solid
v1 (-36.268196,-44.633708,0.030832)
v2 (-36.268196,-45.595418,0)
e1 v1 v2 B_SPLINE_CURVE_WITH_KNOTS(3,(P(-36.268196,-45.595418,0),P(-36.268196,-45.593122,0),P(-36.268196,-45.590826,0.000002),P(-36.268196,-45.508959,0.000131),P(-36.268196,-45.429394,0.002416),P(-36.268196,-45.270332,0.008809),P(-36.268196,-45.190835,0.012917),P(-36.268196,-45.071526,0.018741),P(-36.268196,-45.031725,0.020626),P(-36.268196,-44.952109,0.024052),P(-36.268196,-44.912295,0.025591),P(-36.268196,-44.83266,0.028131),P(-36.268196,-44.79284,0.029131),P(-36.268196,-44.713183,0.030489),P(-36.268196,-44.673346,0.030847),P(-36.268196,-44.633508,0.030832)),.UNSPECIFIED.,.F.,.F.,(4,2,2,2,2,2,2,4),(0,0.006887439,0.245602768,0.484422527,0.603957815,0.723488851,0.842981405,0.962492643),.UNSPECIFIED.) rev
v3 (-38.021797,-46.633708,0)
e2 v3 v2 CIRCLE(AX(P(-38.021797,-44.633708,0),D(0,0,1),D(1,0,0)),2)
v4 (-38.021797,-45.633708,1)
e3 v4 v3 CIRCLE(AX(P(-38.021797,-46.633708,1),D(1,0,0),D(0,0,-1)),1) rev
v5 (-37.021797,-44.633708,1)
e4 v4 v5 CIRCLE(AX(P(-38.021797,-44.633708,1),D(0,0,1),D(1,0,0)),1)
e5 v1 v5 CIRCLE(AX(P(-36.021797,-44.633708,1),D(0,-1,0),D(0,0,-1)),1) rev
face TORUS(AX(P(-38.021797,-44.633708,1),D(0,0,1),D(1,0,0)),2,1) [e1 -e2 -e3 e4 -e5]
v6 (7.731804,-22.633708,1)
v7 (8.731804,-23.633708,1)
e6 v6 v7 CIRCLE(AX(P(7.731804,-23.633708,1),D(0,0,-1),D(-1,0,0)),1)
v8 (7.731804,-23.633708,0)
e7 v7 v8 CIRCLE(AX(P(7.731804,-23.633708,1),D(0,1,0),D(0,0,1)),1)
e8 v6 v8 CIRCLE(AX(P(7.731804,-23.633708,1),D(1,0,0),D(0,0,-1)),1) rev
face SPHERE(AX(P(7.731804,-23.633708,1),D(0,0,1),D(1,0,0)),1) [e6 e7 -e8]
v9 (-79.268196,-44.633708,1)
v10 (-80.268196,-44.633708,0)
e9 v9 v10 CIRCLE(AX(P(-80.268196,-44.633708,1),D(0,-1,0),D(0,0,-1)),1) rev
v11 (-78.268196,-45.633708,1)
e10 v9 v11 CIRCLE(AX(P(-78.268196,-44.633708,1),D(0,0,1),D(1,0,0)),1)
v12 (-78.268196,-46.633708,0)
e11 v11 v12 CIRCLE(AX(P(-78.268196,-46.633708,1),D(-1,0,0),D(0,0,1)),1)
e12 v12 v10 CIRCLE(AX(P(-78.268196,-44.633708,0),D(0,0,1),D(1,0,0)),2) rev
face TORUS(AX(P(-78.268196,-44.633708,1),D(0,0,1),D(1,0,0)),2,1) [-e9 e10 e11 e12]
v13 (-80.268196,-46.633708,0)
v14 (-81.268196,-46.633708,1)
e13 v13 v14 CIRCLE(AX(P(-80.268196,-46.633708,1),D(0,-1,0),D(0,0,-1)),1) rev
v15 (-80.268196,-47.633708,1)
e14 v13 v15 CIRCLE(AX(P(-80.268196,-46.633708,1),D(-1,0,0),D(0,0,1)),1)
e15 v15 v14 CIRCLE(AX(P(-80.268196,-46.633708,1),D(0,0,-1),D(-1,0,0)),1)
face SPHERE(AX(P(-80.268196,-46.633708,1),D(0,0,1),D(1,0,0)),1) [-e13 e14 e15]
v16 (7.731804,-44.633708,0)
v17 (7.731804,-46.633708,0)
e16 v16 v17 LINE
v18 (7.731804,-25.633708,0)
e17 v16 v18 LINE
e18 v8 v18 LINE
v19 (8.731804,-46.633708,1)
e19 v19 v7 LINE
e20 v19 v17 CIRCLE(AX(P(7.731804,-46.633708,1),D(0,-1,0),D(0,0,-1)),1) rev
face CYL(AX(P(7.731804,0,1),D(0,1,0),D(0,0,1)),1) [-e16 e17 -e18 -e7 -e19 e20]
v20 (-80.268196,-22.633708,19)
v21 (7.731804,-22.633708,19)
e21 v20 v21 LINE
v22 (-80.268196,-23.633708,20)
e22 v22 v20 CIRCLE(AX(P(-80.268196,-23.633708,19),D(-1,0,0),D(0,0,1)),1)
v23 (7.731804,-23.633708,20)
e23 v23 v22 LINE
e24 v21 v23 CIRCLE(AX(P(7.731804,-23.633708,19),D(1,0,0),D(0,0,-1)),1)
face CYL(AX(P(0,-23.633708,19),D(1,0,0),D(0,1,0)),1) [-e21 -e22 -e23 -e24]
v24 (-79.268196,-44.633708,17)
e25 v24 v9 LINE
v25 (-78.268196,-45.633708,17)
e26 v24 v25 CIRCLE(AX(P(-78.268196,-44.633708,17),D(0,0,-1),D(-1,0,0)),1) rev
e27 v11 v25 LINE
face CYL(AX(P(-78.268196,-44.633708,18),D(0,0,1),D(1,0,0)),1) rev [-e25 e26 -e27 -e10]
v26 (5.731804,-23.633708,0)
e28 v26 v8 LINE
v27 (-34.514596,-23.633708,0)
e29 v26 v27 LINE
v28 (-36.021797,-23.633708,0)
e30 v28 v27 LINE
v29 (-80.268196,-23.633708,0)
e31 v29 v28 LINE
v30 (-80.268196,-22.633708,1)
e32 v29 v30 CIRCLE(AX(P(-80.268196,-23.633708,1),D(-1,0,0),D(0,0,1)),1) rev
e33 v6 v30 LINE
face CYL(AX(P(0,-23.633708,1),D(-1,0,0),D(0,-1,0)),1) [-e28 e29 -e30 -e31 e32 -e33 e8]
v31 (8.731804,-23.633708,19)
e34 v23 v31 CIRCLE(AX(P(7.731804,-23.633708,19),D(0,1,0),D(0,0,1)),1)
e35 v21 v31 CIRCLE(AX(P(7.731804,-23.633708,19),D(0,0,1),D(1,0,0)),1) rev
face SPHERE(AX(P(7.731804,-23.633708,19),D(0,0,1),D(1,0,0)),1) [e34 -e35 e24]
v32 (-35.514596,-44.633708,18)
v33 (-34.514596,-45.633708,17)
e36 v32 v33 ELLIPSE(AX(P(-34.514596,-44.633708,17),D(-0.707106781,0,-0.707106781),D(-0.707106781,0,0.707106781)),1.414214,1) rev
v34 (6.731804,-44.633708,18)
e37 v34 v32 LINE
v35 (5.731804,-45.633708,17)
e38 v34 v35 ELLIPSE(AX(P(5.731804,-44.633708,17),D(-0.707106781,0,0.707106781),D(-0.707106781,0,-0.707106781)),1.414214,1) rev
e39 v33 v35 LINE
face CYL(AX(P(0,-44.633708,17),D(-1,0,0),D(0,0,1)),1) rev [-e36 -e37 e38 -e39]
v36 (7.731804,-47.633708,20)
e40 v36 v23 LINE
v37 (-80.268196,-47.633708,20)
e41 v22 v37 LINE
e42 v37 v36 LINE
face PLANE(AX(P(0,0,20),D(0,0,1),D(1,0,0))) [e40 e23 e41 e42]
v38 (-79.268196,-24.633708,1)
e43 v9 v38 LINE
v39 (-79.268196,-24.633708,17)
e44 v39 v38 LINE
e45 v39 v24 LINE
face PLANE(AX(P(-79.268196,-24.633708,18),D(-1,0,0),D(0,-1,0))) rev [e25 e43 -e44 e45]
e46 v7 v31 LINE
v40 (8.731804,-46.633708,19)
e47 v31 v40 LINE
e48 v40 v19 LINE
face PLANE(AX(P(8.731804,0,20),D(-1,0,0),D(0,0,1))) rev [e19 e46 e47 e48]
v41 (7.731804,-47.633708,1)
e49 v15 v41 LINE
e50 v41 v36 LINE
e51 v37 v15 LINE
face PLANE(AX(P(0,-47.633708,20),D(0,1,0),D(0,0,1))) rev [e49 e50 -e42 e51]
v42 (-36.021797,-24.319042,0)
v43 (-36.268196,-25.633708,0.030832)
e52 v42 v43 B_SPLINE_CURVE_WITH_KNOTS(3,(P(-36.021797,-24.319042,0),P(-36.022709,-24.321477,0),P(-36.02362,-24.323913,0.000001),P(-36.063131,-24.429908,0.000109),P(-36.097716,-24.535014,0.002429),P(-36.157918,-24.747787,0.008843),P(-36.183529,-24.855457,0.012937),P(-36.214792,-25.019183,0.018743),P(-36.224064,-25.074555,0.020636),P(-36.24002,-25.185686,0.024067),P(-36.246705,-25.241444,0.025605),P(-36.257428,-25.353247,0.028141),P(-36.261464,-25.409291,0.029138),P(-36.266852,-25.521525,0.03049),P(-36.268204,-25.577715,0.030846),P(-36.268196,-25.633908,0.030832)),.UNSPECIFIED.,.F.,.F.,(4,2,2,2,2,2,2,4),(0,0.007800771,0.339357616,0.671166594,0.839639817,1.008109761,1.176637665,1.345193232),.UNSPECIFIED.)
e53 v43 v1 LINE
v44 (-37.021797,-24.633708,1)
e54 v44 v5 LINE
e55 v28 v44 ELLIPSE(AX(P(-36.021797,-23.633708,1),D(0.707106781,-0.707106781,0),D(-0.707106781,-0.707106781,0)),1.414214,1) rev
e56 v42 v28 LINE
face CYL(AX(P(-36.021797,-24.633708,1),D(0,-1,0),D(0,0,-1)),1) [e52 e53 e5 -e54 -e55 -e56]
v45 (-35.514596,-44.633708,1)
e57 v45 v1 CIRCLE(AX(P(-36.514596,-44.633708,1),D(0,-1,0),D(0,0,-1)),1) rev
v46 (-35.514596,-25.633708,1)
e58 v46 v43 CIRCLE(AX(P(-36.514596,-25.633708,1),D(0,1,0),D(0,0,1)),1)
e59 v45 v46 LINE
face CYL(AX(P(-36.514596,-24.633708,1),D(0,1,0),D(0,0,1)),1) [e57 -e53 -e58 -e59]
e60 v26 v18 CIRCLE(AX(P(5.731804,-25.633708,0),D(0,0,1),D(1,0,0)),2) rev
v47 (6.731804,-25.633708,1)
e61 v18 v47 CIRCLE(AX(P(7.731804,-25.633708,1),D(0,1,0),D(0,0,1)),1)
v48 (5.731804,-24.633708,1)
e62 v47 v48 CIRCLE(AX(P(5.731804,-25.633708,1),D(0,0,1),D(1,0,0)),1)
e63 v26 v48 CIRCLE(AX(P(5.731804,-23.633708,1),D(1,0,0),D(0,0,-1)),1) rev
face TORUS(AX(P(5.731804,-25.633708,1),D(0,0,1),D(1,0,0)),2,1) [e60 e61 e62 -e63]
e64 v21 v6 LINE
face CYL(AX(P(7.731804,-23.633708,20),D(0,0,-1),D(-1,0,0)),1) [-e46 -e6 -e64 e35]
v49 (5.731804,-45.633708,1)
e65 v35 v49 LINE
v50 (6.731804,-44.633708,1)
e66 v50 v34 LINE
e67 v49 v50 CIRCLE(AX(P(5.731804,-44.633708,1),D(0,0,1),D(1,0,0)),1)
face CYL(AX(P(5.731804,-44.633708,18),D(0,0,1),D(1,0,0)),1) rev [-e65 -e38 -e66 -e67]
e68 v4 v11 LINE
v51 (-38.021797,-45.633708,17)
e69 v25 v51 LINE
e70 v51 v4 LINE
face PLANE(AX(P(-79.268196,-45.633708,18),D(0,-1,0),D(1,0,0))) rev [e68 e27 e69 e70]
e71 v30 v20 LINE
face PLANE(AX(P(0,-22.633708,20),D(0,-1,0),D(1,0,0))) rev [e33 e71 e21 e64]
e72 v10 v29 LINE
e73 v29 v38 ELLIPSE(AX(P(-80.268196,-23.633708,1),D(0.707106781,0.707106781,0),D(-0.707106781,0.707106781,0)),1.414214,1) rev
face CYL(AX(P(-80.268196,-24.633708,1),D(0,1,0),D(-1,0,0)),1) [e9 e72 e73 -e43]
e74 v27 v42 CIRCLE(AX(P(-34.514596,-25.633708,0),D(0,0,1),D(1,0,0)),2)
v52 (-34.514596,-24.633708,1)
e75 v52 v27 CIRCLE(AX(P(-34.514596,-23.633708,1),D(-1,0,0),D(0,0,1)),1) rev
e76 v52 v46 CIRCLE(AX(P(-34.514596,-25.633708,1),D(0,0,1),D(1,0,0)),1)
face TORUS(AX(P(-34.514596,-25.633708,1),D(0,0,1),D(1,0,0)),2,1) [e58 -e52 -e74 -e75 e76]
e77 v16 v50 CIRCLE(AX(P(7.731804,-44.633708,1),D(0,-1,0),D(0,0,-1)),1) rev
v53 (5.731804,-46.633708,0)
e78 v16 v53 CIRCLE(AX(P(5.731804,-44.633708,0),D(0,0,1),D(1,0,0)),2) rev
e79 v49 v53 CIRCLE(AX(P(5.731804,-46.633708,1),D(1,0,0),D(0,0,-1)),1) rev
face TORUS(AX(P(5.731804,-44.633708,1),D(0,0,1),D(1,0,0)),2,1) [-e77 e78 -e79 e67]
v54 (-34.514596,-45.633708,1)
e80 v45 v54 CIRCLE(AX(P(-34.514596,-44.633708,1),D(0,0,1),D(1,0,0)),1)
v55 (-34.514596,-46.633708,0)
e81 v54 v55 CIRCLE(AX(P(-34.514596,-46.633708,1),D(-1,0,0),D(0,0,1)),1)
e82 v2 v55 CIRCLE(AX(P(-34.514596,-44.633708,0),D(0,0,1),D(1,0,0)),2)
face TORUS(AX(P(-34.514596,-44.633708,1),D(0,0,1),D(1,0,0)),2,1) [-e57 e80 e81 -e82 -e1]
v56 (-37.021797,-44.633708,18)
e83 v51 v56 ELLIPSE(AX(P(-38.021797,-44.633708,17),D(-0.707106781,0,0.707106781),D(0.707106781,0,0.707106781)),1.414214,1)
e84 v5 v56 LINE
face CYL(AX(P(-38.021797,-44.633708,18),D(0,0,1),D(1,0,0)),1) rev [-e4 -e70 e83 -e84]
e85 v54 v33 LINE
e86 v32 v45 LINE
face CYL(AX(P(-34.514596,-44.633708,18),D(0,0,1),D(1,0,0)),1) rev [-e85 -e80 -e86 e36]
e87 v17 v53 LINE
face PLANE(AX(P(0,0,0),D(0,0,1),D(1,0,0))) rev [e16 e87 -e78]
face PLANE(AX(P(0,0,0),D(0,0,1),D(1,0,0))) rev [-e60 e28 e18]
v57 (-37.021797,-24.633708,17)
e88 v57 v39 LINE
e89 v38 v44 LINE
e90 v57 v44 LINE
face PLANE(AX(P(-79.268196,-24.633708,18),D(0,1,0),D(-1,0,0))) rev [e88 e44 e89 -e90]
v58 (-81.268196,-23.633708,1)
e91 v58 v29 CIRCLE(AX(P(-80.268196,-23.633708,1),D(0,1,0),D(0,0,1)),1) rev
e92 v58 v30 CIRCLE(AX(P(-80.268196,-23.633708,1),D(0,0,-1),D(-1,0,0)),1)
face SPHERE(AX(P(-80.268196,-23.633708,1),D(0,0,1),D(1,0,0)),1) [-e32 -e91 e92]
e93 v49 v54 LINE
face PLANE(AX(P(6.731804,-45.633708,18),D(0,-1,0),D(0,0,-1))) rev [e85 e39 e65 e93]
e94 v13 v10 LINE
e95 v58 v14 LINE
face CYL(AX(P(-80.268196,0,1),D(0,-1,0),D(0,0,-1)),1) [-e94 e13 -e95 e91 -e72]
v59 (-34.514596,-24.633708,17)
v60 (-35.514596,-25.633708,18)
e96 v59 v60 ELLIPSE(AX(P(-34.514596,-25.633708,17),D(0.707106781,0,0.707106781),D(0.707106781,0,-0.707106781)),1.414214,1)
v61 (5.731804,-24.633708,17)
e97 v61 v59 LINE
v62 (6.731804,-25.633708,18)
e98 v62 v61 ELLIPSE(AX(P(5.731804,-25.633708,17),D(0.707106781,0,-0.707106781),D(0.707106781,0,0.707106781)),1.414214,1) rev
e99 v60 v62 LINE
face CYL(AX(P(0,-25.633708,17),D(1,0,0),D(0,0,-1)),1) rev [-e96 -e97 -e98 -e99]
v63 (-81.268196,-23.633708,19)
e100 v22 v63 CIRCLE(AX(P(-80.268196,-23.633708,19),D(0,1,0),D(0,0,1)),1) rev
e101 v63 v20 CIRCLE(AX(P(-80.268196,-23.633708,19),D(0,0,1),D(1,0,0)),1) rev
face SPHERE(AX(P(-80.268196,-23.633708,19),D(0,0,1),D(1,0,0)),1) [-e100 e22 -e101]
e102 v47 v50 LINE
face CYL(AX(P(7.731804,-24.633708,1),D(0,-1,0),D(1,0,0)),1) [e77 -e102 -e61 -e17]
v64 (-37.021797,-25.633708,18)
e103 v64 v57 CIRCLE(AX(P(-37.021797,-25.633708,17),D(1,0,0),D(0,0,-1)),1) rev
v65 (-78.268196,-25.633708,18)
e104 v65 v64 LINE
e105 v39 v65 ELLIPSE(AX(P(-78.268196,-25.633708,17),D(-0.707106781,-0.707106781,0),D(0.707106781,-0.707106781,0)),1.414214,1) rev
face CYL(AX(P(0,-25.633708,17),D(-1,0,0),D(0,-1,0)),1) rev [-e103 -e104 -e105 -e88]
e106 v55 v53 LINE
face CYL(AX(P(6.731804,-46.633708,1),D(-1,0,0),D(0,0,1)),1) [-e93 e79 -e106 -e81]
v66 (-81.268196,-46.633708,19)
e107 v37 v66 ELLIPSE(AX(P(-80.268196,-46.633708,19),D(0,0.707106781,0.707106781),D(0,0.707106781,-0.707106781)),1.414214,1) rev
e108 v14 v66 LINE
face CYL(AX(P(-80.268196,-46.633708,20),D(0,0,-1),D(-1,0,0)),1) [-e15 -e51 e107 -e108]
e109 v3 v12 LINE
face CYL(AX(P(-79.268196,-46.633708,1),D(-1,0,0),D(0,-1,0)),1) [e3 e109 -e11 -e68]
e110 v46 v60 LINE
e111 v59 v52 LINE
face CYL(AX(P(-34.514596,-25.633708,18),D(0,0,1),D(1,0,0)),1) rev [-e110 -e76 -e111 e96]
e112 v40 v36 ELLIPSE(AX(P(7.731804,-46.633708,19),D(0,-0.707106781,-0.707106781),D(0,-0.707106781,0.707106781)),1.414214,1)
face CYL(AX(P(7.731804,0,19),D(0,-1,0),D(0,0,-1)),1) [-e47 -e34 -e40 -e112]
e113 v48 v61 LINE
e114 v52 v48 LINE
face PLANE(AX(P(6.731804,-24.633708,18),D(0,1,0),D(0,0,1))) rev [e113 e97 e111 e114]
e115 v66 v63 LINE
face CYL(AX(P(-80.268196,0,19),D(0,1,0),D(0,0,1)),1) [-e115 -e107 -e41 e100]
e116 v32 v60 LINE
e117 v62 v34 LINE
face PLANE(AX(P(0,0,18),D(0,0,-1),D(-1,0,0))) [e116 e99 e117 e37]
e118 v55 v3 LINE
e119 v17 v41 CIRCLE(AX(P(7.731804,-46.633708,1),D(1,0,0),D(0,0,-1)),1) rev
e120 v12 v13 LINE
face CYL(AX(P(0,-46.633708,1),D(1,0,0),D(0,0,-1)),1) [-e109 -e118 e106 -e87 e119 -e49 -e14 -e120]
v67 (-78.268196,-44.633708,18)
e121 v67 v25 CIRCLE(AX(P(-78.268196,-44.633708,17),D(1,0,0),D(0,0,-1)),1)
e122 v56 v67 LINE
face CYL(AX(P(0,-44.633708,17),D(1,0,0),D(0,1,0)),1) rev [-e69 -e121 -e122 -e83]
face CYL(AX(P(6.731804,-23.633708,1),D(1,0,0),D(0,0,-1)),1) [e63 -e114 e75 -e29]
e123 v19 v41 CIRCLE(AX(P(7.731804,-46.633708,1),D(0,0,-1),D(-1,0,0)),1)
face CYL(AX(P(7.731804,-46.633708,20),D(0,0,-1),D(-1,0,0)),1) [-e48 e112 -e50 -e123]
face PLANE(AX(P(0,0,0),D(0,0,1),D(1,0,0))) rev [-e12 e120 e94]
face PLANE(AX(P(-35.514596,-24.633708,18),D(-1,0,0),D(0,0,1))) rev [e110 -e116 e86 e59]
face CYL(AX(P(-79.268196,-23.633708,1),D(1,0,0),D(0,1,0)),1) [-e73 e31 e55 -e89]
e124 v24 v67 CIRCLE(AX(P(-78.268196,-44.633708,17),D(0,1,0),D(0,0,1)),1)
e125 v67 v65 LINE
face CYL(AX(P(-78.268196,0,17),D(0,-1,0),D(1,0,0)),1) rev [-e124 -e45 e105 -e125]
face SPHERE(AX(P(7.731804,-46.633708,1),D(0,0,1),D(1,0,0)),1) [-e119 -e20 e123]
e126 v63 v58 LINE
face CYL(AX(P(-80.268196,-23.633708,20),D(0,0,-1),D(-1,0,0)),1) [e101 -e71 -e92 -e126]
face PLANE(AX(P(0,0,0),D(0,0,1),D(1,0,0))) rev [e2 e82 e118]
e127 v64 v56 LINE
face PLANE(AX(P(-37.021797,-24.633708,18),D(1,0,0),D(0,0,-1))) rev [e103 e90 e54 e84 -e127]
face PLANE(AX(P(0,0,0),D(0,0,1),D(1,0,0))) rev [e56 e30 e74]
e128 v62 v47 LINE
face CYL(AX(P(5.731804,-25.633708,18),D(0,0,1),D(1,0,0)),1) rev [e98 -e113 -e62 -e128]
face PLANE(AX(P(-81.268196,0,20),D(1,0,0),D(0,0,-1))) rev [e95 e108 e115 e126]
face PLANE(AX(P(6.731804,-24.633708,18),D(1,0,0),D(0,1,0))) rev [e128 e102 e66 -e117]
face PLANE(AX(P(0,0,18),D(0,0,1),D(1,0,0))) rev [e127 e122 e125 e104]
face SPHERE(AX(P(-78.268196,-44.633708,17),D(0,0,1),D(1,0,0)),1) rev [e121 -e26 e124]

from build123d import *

# Parameters (mm, degrees)
SKETCH_1_W          = 90
SKETCH_1_H          = 25
EXTRUDE_1_DEPTH     = 20
SKETCH_4_W          = 42.246399656
SKETCH_4_H          = 21
CUT_EXTRUDE_2_DEPTH = 18
FILLET_5_R          = 1


with BuildPart() as part:
    # 草圖1 → 填料-伸長1 (new body)
    with BuildSketch(Plane.XY):
        with Locations((-36.268196215, -35.133707849)):
            Rectangle(SKETCH_1_W, SKETCH_1_H)
    extrude(amount=EXTRUDE_1_DEPTH)

    # 草圖4 → 除料-伸長2 (cut)
    with BuildSketch(Plane(origin=(0, 0, 0), x_dir=(-1, 0, 0), z_dir=(0, 0, -1))):
        with Locations((14.391396043, -35.133707849)):
            Rectangle(SKETCH_4_W, SKETCH_4_H)
        with Locations((58.144996387, -35.133707849)):
            Rectangle(SKETCH_4_W, SKETCH_4_H)
    extrude(amount=-CUT_EXTRUDE_2_DEPTH, mode=Mode.SUBTRACT)

    # 圓角5
    # the kernel refuses this fillet: 1 mm, written as the material it adds along each edge
    with BuildSketch(Plane(origin=(-78.268196215, -44.633707849, 17), x_dir=(-1, 0, 0), z_dir=(0, -1, 0))) as fillet_5_piece_1_section:
        Polygon((0, 0), (FILLET_5_R * 1.02, 0), (FILLET_5_R * 1.02, -FILLET_5_R * 1.02), (0, -FILLET_5_R * 1.02), align=None)
    fillet_5_piece_1 = extrude(amount=FILLET_5_R * 1.02, mode=Mode.PRIVATE)
    fillet_5_piece_1 = fillet_5_piece_1 - Plane(origin=(-78.268196215, -44.633707849, 17), x_dir=(0.7071067811865475, -1.914017473443079e-15, -0.7071067811865475), z_dir=(0, -1, 0)) * Sphere(FILLET_5_R, mode=Mode.PRIVATE)
    add(fillet_5_piece_1)
    with BuildSketch(Plane(origin=(6.731803785, -45.633707849, 0), x_dir=(-1, 0, 0), z_dir=(0, 0, 1)), Plane(origin=(-35.514595871, -24.633707849, 0), x_dir=(1, 0, 0), z_dir=(0, 0, 1)), Plane(origin=(-35.514595871, -45.633707849, 0), x_dir=(0, 1, 0), z_dir=(0, 0, 1)), Plane(origin=(-37.021796559, -45.633707849, 0), x_dir=(-1, 0, 0), z_dir=(0, 0, 1))) as fillet_5_piece_2:
        with BuildLine():
            CenterArc((FILLET_5_R, -FILLET_5_R), FILLET_5_R, 90, 90)
            Line((0, -FILLET_5_R), (-FILLET_5_R * 0.02, -FILLET_5_R))
            Line((-FILLET_5_R * 0.02, -FILLET_5_R), (-FILLET_5_R * 0.02, FILLET_5_R * 0.02))
            Line((-FILLET_5_R * 0.02, FILLET_5_R * 0.02), (FILLET_5_R, FILLET_5_R * 0.02))
            Line((FILLET_5_R, FILLET_5_R * 0.02), (FILLET_5_R, 0))
        make_face()
    extrude(amount=18)
    with BuildSketch(Plane(origin=(6.731803785, -24.633707849, 18), x_dir=(0, 0, -1), z_dir=(-1, 0, 0)), Plane(origin=(-35.514595871, -45.633707849, 18), x_dir=(0, 0, -1), z_dir=(1, 0, 0)), Plane(origin=(-37.021796559, -24.633707849, 18), x_dir=(0, 0, -1), z_dir=(-1, 0, 0))) as fillet_5_piece_3:
        with BuildLine():
            CenterArc((FILLET_5_R, FILLET_5_R), FILLET_5_R, 180, 90)
            Line((0, FILLET_5_R), (-FILLET_5_R * 0.02, FILLET_5_R))
            Line((-FILLET_5_R * 0.02, FILLET_5_R), (-FILLET_5_R * 0.02, -FILLET_5_R * 0.02))
            Line((-FILLET_5_R * 0.02, -FILLET_5_R * 0.02), (FILLET_5_R, -FILLET_5_R * 0.02))
            Line((FILLET_5_R, -FILLET_5_R * 0.02), (FILLET_5_R, 0))
        make_face()
    extrude(amount=42.246399656)
    with BuildSketch(Plane(origin=(6.731803785, -24.633707849, 0), x_dir=(-1, 0, 0), z_dir=(0, 0, 1))) as fillet_5_piece_4:
        with BuildLine():
            CenterArc((FILLET_5_R, FILLET_5_R), FILLET_5_R, 180, 90)
            Line((0, FILLET_5_R), (-FILLET_5_R * 0.02, FILLET_5_R))
            Line((-FILLET_5_R * 0.02, FILLET_5_R), (-FILLET_5_R * 0.02, -FILLET_5_R * 0.02))
            Line((-FILLET_5_R * 0.02, -FILLET_5_R * 0.02), (FILLET_5_R, -FILLET_5_R * 0.02))
            Line((FILLET_5_R, -FILLET_5_R * 0.02), (FILLET_5_R, 0))
        make_face()
    extrude(amount=18)
    with BuildSketch(Plane(origin=(-79.268196215, -24.633707849, 18), x_dir=(0, 0, -1), z_dir=(0, -1, 0))) as fillet_5_piece_5:
        with BuildLine():
            CenterArc((FILLET_5_R, FILLET_5_R), FILLET_5_R, 180, 90)
            Line((0, FILLET_5_R), (-FILLET_5_R * 0.02, FILLET_5_R))
            Line((-FILLET_5_R * 0.02, FILLET_5_R), (-FILLET_5_R * 0.02, -FILLET_5_R * 0.02))
            Line((-FILLET_5_R * 0.02, -FILLET_5_R * 0.02), (FILLET_5_R, -FILLET_5_R * 0.02))
            Line((FILLET_5_R, -FILLET_5_R * 0.02), (FILLET_5_R, 0))
        make_face()
    extrude(amount=20)
    with BuildSketch(Plane(origin=(-78.268196215, -45.633707849, 18), x_dir=(0, 0, -1), z_dir=(1, 0, 0))) as fillet_5_piece_6:
        with BuildLine():
            CenterArc((FILLET_5_R, FILLET_5_R), FILLET_5_R, 180, 90)
            Line((0, FILLET_5_R), (-FILLET_5_R * 0.02, FILLET_5_R))
            Line((-FILLET_5_R * 0.02, FILLET_5_R), (-FILLET_5_R * 0.02, -FILLET_5_R * 0.02))
            Line((-FILLET_5_R * 0.02, -FILLET_5_R * 0.02), (FILLET_5_R, -FILLET_5_R * 0.02))
            Line((FILLET_5_R, -FILLET_5_R * 0.02), (FILLET_5_R, 0))
        make_face()
    extrude(amount=41.246399656)
    with BuildSketch(Plane(origin=(-79.268196215, -45.633707849, 0), x_dir=(1, 0, 0), z_dir=(0, 0, 1))) as fillet_5_piece_7:
        with BuildLine():
            CenterArc((FILLET_5_R, FILLET_5_R), FILLET_5_R, 180, 90)
            Line((0, FILLET_5_R), (-FILLET_5_R * 0.02, FILLET_5_R))
            Line((-FILLET_5_R * 0.02, FILLET_5_R), (-FILLET_5_R * 0.02, -FILLET_5_R * 0.02))
            Line((-FILLET_5_R * 0.02, -FILLET_5_R * 0.02), (FILLET_5_R, -FILLET_5_R * 0.02))
            Line((FILLET_5_R, -FILLET_5_R * 0.02), (FILLET_5_R, 0))
        make_face()
    extrude(amount=17)
    with BuildSketch(Plane(origin=(6.731803785, -45.633707849, 0), x_dir=(-1, 0, 0), z_dir=(0, 0, 1))) as fillet_5_piece_8a_section:
        with BuildLine():
            CenterArc((FILLET_5_R, -FILLET_5_R), FILLET_5_R, 90, 90)
            Line((0, -FILLET_5_R), (-FILLET_5_R * 0.02, -FILLET_5_R))
            Line((-FILLET_5_R * 0.02, -FILLET_5_R), (-FILLET_5_R * 0.02, FILLET_5_R * 0.02))
            Line((-FILLET_5_R * 0.02, FILLET_5_R * 0.02), (FILLET_5_R, FILLET_5_R * 0.02))
            Line((FILLET_5_R, FILLET_5_R * 0.02), (FILLET_5_R, 0))
        make_face()
    fillet_5_piece_8a = extrude(amount=20.5, mode=Mode.PRIVATE)
    fillet_5_piece_8a = split(fillet_5_piece_8a, bisect_by=Plane(origin=(6.505408671, -45.407312734, 18), z_dir=(0, 0, 1)), keep=Keep.TOP, mode=Mode.PRIVATE)
    with BuildSketch(Plane(origin=(-35.514595871, -45.633707849, 18), x_dir=(0, 0, -1), z_dir=(1, 0, 0))) as fillet_5_piece_8b_section:
        with BuildLine():
            CenterArc((FILLET_5_R, FILLET_5_R), FILLET_5_R, 180, 90)
            Line((0, FILLET_5_R), (-FILLET_5_R * 0.02, FILLET_5_R))
            Line((-FILLET_5_R * 0.02, FILLET_5_R), (-FILLET_5_R * 0.02, -FILLET_5_R * 0.02))
            Line((-FILLET_5_R * 0.02, -FILLET_5_R * 0.02), (FILLET_5_R, -FILLET_5_R * 0.02))
            Line((FILLET_5_R, -FILLET_5_R * 0.02), (FILLET_5_R, 0))
        make_face()
    fillet_5_piece_8b = extrude(amount=44.746399656, mode=Mode.PRIVATE)
    fillet_5_piece_8b = split(fillet_5_piece_8b, bisect_by=Plane(origin=(6.731803785, -45.407312734, 17.773604886), z_dir=(1, 0, 0)), keep=Keep.TOP, mode=Mode.PRIVATE)
    fillet_5_piece_8 = fillet_5_piece_8a & fillet_5_piece_8b
    add(fillet_5_piece_8)
    with BuildSketch(Plane(origin=(6.731803785, -24.633707849, 0), x_dir=(-1, 0, 0), z_dir=(0, 0, 1))) as fillet_5_piece_9a_section:
        with BuildLine():
            CenterArc((FILLET_5_R, FILLET_5_R), FILLET_5_R, 180, 90)
            Line((0, FILLET_5_R), (-FILLET_5_R * 0.02, FILLET_5_R))
            Line((-FILLET_5_R * 0.02, FILLET_5_R), (-FILLET_5_R * 0.02, -FILLET_5_R * 0.02))
            Line((-FILLET_5_R * 0.02, -FILLET_5_R * 0.02), (FILLET_5_R, -FILLET_5_R * 0.02))
            Line((FILLET_5_R, -FILLET_5_R * 0.02), (FILLET_5_R, 0))
        make_face()
    fillet_5_piece_9a = extrude(amount=20.5, mode=Mode.PRIVATE)
    fillet_5_piece_9a = split(fillet_5_piece_9a, bisect_by=Plane(origin=(6.505408671, -24.860102963, 18), z_dir=(0, 0, 1)), keep=Keep.TOP, mode=Mode.PRIVATE)
    with BuildSketch(Plane(origin=(9.231803785, -24.633707849, 18), x_dir=(0, 0, -1), z_dir=(-1, 0, 0))) as fillet_5_piece_9b_section:
        with BuildLine():
            CenterArc((FILLET_5_R, FILLET_5_R), FILLET_5_R, 180, 90)
            Line((0, FILLET_5_R), (-FILLET_5_R * 0.02, FILLET_5_R))
            Line((-FILLET_5_R * 0.02, FILLET_5_R), (-FILLET_5_R * 0.02, -FILLET_5_R * 0.02))
            Line((-FILLET_5_R * 0.02, -FILLET_5_R * 0.02), (FILLET_5_R, -FILLET_5_R * 0.02))
            Line((FILLET_5_R, -FILLET_5_R * 0.02), (FILLET_5_R, 0))
        make_face()
    fillet_5_piece_9b = extrude(amount=44.746399656, mode=Mode.PRIVATE)
    fillet_5_piece_9b = split(fillet_5_piece_9b, bisect_by=Plane(origin=(6.731803785, -24.860102963, 17.773604886), z_dir=(1, 0, 0)), keep=Keep.TOP, mode=Mode.PRIVATE)
    fillet_5_piece_9 = fillet_5_piece_9a & fillet_5_piece_9b
    add(fillet_5_piece_9)
    with BuildSketch(Plane(origin=(-35.514595871, -24.633707849, 0), x_dir=(1, 0, 0), z_dir=(0, 0, 1))) as fillet_5_piece_10a_section:
        with BuildLine():
            CenterArc((FILLET_5_R, -FILLET_5_R), FILLET_5_R, 90, 90)
            Line((0, -FILLET_5_R), (-FILLET_5_R * 0.02, -FILLET_5_R))
            Line((-FILLET_5_R * 0.02, -FILLET_5_R), (-FILLET_5_R * 0.02, FILLET_5_R * 0.02))
            Line((-FILLET_5_R * 0.02, FILLET_5_R * 0.02), (FILLET_5_R, FILLET_5_R * 0.02))
            Line((FILLET_5_R, FILLET_5_R * 0.02), (FILLET_5_R, 0))
        make_face()
    fillet_5_piece_10a = extrude(amount=20.5, mode=Mode.PRIVATE)
    fillet_5_piece_10a = split(fillet_5_piece_10a, bisect_by=Plane(origin=(-35.288200757, -24.860102963, 18), z_dir=(0, 0, 1)), keep=Keep.TOP, mode=Mode.PRIVATE)
    with BuildSketch(Plane(origin=(6.731803785, -24.633707849, 18), x_dir=(0, 0, -1), z_dir=(-1, 0, 0))) as fillet_5_piece_10b_section:
        with BuildLine():
            CenterArc((FILLET_5_R, FILLET_5_R), FILLET_5_R, 180, 90)
            Line((0, FILLET_5_R), (-FILLET_5_R * 0.02, FILLET_5_R))
            Line((-FILLET_5_R * 0.02, FILLET_5_R), (-FILLET_5_R * 0.02, -FILLET_5_R * 0.02))
            Line((-FILLET_5_R * 0.02, -FILLET_5_R * 0.02), (FILLET_5_R, -FILLET_5_R * 0.02))
            Line((FILLET_5_R, -FILLET_5_R * 0.02), (FILLET_5_R, 0))
        make_face()
    fillet_5_piece_10b = extrude(amount=44.746399656, mode=Mode.PRIVATE)
    fillet_5_piece_10b = split(fillet_5_piece_10b, bisect_by=Plane(origin=(-35.514595871, -24.860102963, 17.773604886), z_dir=(-1, 0, 0)), keep=Keep.TOP, mode=Mode.PRIVATE)
    fillet_5_piece_10 = fillet_5_piece_10a & fillet_5_piece_10b
    add(fillet_5_piece_10)
    with BuildSketch(Plane(origin=(-35.514595871, -45.633707849, 0), x_dir=(0, 1, 0), z_dir=(0, 0, 1))) as fillet_5_piece_11a_section:
        with BuildLine():
            CenterArc((FILLET_5_R, -FILLET_5_R), FILLET_5_R, 90, 90)
            Line((0, -FILLET_5_R), (-FILLET_5_R * 0.02, -FILLET_5_R))
            Line((-FILLET_5_R * 0.02, -FILLET_5_R), (-FILLET_5_R * 0.02, FILLET_5_R * 0.02))
            Line((-FILLET_5_R * 0.02, FILLET_5_R * 0.02), (FILLET_5_R, FILLET_5_R * 0.02))
            Line((FILLET_5_R, FILLET_5_R * 0.02), (FILLET_5_R, 0))
        make_face()
    fillet_5_piece_11a = extrude(amount=20.5, mode=Mode.PRIVATE)
    fillet_5_piece_11a = split(fillet_5_piece_11a, bisect_by=Plane(origin=(-35.288200757, -45.407312734, 18), z_dir=(0, 0, 1)), keep=Keep.TOP, mode=Mode.PRIVATE)
    with BuildSketch(Plane(origin=(-38.014595871, -45.633707849, 18), x_dir=(0, 0, -1), z_dir=(1, 0, 0))) as fillet_5_piece_11b_section:
        with BuildLine():
            CenterArc((FILLET_5_R, FILLET_5_R), FILLET_5_R, 180, 90)
            Line((0, FILLET_5_R), (-FILLET_5_R * 0.02, FILLET_5_R))
            Line((-FILLET_5_R * 0.02, FILLET_5_R), (-FILLET_5_R * 0.02, -FILLET_5_R * 0.02))
            Line((-FILLET_5_R * 0.02, -FILLET_5_R * 0.02), (FILLET_5_R, -FILLET_5_R * 0.02))
            Line((FILLET_5_R, -FILLET_5_R * 0.02), (FILLET_5_R, 0))
        make_face()
    fillet_5_piece_11b = extrude(amount=44.746399656, mode=Mode.PRIVATE)
    fillet_5_piece_11b = split(fillet_5_piece_11b, bisect_by=Plane(origin=(-35.514595871, -45.407312734, 17.773604886), z_dir=(-1, 0, 0)), keep=Keep.TOP, mode=Mode.PRIVATE)
    fillet_5_piece_11 = fillet_5_piece_11a & fillet_5_piece_11b
    add(fillet_5_piece_11)
    with BuildSketch(Plane(origin=(-37.021796559, -24.633707849, 18), x_dir=(0, 0, -1), z_dir=(-1, 0, 0))) as fillet_5_piece_12a_section:
        with BuildLine():
            CenterArc((FILLET_5_R, FILLET_5_R), FILLET_5_R, 180, 90)
            Line((0, FILLET_5_R), (-FILLET_5_R * 0.02, FILLET_5_R))
            Line((-FILLET_5_R * 0.02, FILLET_5_R), (-FILLET_5_R * 0.02, -FILLET_5_R * 0.02))
            Line((-FILLET_5_R * 0.02, -FILLET_5_R * 0.02), (FILLET_5_R, -FILLET_5_R * 0.02))
            Line((FILLET_5_R, -FILLET_5_R * 0.02), (FILLET_5_R, 0))
        make_face()
    fillet_5_piece_12a = extrude(amount=44.746399656, mode=Mode.PRIVATE)
    fillet_5_piece_12a = split(fillet_5_piece_12a, bisect_by=Plane(origin=(-79.268196215, -24.860102963, 17.773604886), z_dir=(-1, 0, 0)), keep=Keep.TOP, mode=Mode.PRIVATE)
    with BuildSketch(Plane(origin=(-79.268196215, -22.133707849, 18), x_dir=(0, 0, -1), z_dir=(0, -1, 0))) as fillet_5_piece_12b_section:
        with BuildLine():
            CenterArc((FILLET_5_R, FILLET_5_R), FILLET_5_R, 180, 90)
            Line((0, FILLET_5_R), (-FILLET_5_R * 0.02, FILLET_5_R))
            Line((-FILLET_5_R * 0.02, FILLET_5_R), (-FILLET_5_R * 0.02, -FILLET_5_R * 0.02))
            Line((-FILLET_5_R * 0.02, -FILLET_5_R * 0.02), (FILLET_5_R, -FILLET_5_R * 0.02))
            Line((FILLET_5_R, -FILLET_5_R * 0.02), (FILLET_5_R, 0))
        make_face()
    fillet_5_piece_12b = extrude(amount=22.5, mode=Mode.PRIVATE)
    fillet_5_piece_12b = split(fillet_5_piece_12b, bisect_by=Plane(origin=(-79.041801101, -24.633707849, 17.773604886), z_dir=(0, 1, 0)), keep=Keep.TOP, mode=Mode.PRIVATE)
    fillet_5_piece_12 = fillet_5_piece_12a & fillet_5_piece_12b
    add(fillet_5_piece_12)
    with BuildSketch(Plane(origin=(-37.021796559, -45.633707849, 0), x_dir=(-1, 0, 0), z_dir=(0, 0, 1))) as fillet_5_piece_13a_section:
        with BuildLine():
            CenterArc((FILLET_5_R, -FILLET_5_R), FILLET_5_R, 90, 90)
            Line((0, -FILLET_5_R), (-FILLET_5_R * 0.02, -FILLET_5_R))
            Line((-FILLET_5_R * 0.02, -FILLET_5_R), (-FILLET_5_R * 0.02, FILLET_5_R * 0.02))
            Line((-FILLET_5_R * 0.02, FILLET_5_R * 0.02), (FILLET_5_R, FILLET_5_R * 0.02))
            Line((FILLET_5_R, FILLET_5_R * 0.02), (FILLET_5_R, 0))
        make_face()
    fillet_5_piece_13a = extrude(amount=20.5, mode=Mode.PRIVATE)
    fillet_5_piece_13a = split(fillet_5_piece_13a, bisect_by=Plane(origin=(-37.248191673, -45.407312734, 18), z_dir=(0, 0, 1)), keep=Keep.TOP, mode=Mode.PRIVATE)
    with BuildSketch(Plane(origin=(-78.268196215, -45.633707849, 18), x_dir=(0, 0, -1), z_dir=(1, 0, 0))) as fillet_5_piece_13b_section:
        with BuildLine():
            CenterArc((FILLET_5_R, FILLET_5_R), FILLET_5_R, 180, 90)
            Line((0, FILLET_5_R), (-FILLET_5_R * 0.02, FILLET_5_R))
            Line((-FILLET_5_R * 0.02, FILLET_5_R), (-FILLET_5_R * 0.02, -FILLET_5_R * 0.02))
            Line((-FILLET_5_R * 0.02, -FILLET_5_R * 0.02), (FILLET_5_R, -FILLET_5_R * 0.02))
            Line((FILLET_5_R, -FILLET_5_R * 0.02), (FILLET_5_R, 0))
        make_face()
    fillet_5_piece_13b = extrude(amount=43.746399656, mode=Mode.PRIVATE)
    fillet_5_piece_13b = split(fillet_5_piece_13b, bisect_by=Plane(origin=(-37.021796559, -45.407312734, 17.773604886), z_dir=(1, 0, 0)), keep=Keep.TOP, mode=Mode.PRIVATE)
    fillet_5_piece_13 = fillet_5_piece_13a & fillet_5_piece_13b
    add(fillet_5_piece_13)
    # the kernel refuses this fillet: 1 mm, written as the material it takes off along each edge
    with BuildSketch(Plane(origin=(-80.268196215, -23.633707849, 19), x_dir=(-1, 0, 0), z_dir=(0, 1, 0))) as fillet_5_2_piece_1_section:
        Polygon((0, 0), (FILLET_5_R * 1.02, 0), (FILLET_5_R * 1.02, FILLET_5_R * 1.02), (0, FILLET_5_R * 1.02), align=None)
    fillet_5_2_piece_1 = extrude(amount=FILLET_5_R * 1.02, mode=Mode.PRIVATE)
    fillet_5_2_piece_1 = fillet_5_2_piece_1 - Plane(origin=(-80.268196215, -23.633707849, 19), x_dir=(0.7071067811865475, 0, -0.7071067811865475), z_dir=(0, 1, 0)) * Sphere(FILLET_5_R, mode=Mode.PRIVATE)
    add(fillet_5_2_piece_1, mode=Mode.SUBTRACT)
    with BuildSketch(Plane(origin=(7.731803785, -23.633707849, 19), x_dir=(1, 0, 0), z_dir=(0, 1, 0))) as fillet_5_2_piece_2_section:
        Polygon((0, 0), (FILLET_5_R * 1.02, 0), (FILLET_5_R * 1.02, -FILLET_5_R * 1.02), (0, -FILLET_5_R * 1.02), align=None)
    fillet_5_2_piece_2 = extrude(amount=FILLET_5_R * 1.02, mode=Mode.PRIVATE)
    fillet_5_2_piece_2 = fillet_5_2_piece_2 - Plane(origin=(7.731803785, -23.633707849, 19), x_dir=(-0.7071067811865475, 0, -0.7071067811865475), z_dir=(0, 1, 0)) * Sphere(FILLET_5_R, mode=Mode.PRIVATE)
    add(fillet_5_2_piece_2, mode=Mode.SUBTRACT)
    with BuildSketch(Plane(origin=(7.731803785, -46.633707849, 1), x_dir=(0, 0, -1), z_dir=(1, 0, 0))) as fillet_5_2_piece_3_section:
        Polygon((0, 0), (FILLET_5_R * 1.02, 0), (FILLET_5_R * 1.02, -FILLET_5_R * 1.02), (0, -FILLET_5_R * 1.02), align=None)
    fillet_5_2_piece_3 = extrude(amount=FILLET_5_R * 1.02, mode=Mode.PRIVATE)
    fillet_5_2_piece_3 = fillet_5_2_piece_3 - Plane(origin=(7.731803785, -46.633707849, 1), x_dir=(0, 0.7071067811865475, 0.7071067811865475), z_dir=(1, 0, 0)) * Sphere(FILLET_5_R, mode=Mode.PRIVATE)
    add(fillet_5_2_piece_3, mode=Mode.SUBTRACT)
    with BuildSketch(Plane(origin=(7.731803785, -23.633707849, 1), x_dir=(1, 0, 0), z_dir=(0, 1, 0))) as fillet_5_2_piece_4_section:
        Polygon((0, 0), (FILLET_5_R * 1.02, 0), (FILLET_5_R * 1.02, FILLET_5_R * 1.02), (0, FILLET_5_R * 1.02), align=None)
    fillet_5_2_piece_4 = extrude(amount=FILLET_5_R * 1.02, mode=Mode.PRIVATE)
    fillet_5_2_piece_4 = fillet_5_2_piece_4 - Plane(origin=(7.731803785, -23.633707849, 1), x_dir=(-0.7071067811865475, 0, 0.7071067811865475), z_dir=(0, 1, 0)) * Sphere(FILLET_5_R, mode=Mode.PRIVATE)
    add(fillet_5_2_piece_4, mode=Mode.SUBTRACT)
    with BuildSketch(Plane(origin=(-80.268196215, -46.633707849, 1), x_dir=(0, 0, -1), z_dir=(-1, 0, 0))) as fillet_5_2_piece_5_section:
        Polygon((0, 0), (FILLET_5_R * 1.02, 0), (FILLET_5_R * 1.02, FILLET_5_R * 1.02), (0, FILLET_5_R * 1.02), align=None)
    fillet_5_2_piece_5 = extrude(amount=FILLET_5_R * 1.02, mode=Mode.PRIVATE)
    fillet_5_2_piece_5 = fillet_5_2_piece_5 - Plane(origin=(-80.268196215, -46.633707849, 1), x_dir=(0, 0.7071067811865475, 0.7071067811865475), z_dir=(-1, 0, 0)) * Sphere(FILLET_5_R, mode=Mode.PRIVATE)
    add(fillet_5_2_piece_5, mode=Mode.SUBTRACT)
    with BuildSketch(Plane(origin=(-80.268196215, -23.633707849, 1), x_dir=(-1, 0, 0), z_dir=(0, 1, 0))) as fillet_5_2_piece_6_section:
        Polygon((0, 0), (FILLET_5_R * 1.02, 0), (FILLET_5_R * 1.02, -FILLET_5_R * 1.02), (0, -FILLET_5_R * 1.02), align=None)
    fillet_5_2_piece_6 = extrude(amount=FILLET_5_R * 1.02, mode=Mode.PRIVATE)
    fillet_5_2_piece_6 = fillet_5_2_piece_6 - Plane(origin=(-80.268196215, -23.633707849, 1), x_dir=(0.7071067811865475, 0, 0.7071067811865475), z_dir=(0, 1, 0)) * Sphere(FILLET_5_R, mode=Mode.PRIVATE)
    add(fillet_5_2_piece_6, mode=Mode.SUBTRACT)
    with BuildSketch(Plane(origin=(-81.268196215, -23.633707849, 20), x_dir=(0, 0, -1), z_dir=(0, -1, 0)), Plane(origin=(8.731803785, -47.633707849, 20), x_dir=(0, 0, -1), z_dir=(0, 1, 0))) as fillet_5_2_piece_7:
        with BuildLine():
            CenterArc((FILLET_5_R, FILLET_5_R), FILLET_5_R, 180, 90)
            Line((0, FILLET_5_R), (-FILLET_5_R * 0.02, FILLET_5_R))
            Line((-FILLET_5_R * 0.02, FILLET_5_R), (-FILLET_5_R * 0.02, -FILLET_5_R * 0.02))
            Line((-FILLET_5_R * 0.02, -FILLET_5_R * 0.02), (FILLET_5_R, -FILLET_5_R * 0.02))
            Line((FILLET_5_R, -FILLET_5_R * 0.02), (FILLET_5_R, 0))
        make_face()
    extrude(amount=24, mode=Mode.SUBTRACT)
    with BuildSketch(Plane(origin=(-37.021796559, -24.633707849, 0), x_dir=(0, 1, 0), z_dir=(-1, 0, 0))) as fillet_5_2_piece_8:
        with BuildLine():
            CenterArc((FILLET_5_R, -FILLET_5_R), FILLET_5_R, 90, 90)
            Line((0, -FILLET_5_R), (-FILLET_5_R * 0.02, -FILLET_5_R))
            Line((-FILLET_5_R * 0.02, -FILLET_5_R), (-FILLET_5_R * 0.02, FILLET_5_R * 0.02))
            Line((-FILLET_5_R * 0.02, FILLET_5_R * 0.02), (FILLET_5_R, FILLET_5_R * 0.02))
            Line((FILLET_5_R, FILLET_5_R * 0.02), (FILLET_5_R, 0))
        make_face()
    extrude(amount=42.246399656, mode=Mode.SUBTRACT)
    with BuildSketch(Plane(origin=(8.731803785, -46.633707849, 0), x_dir=(0, 0, 1), z_dir=(0, 1, 0)), Plane(origin=(-81.268196215, -23.633707849, 0), x_dir=(0, 0, 1), z_dir=(0, -1, 0))) as fillet_5_2_piece_9:
        with BuildLine():
            CenterArc((FILLET_5_R, -FILLET_5_R), FILLET_5_R, 90, 90)
            Line((0, -FILLET_5_R), (-FILLET_5_R * 0.02, -FILLET_5_R))
            Line((-FILLET_5_R * 0.02, -FILLET_5_R), (-FILLET_5_R * 0.02, FILLET_5_R * 0.02))
            Line((-FILLET_5_R * 0.02, FILLET_5_R * 0.02), (FILLET_5_R, FILLET_5_R * 0.02))
            Line((FILLET_5_R, FILLET_5_R * 0.02), (FILLET_5_R, 0))
        make_face()
    extrude(amount=23, mode=Mode.SUBTRACT)
    with BuildSketch(Plane(origin=(7.731803785, -22.633707849, 20), x_dir=(0, 0, -1), z_dir=(-1, 0, 0)), Plane(origin=(-80.268196215, -47.633707849, 0), x_dir=(0, 1, 0), z_dir=(1, 0, 0))) as fillet_5_2_piece_10:
        with BuildLine():
            CenterArc((FILLET_5_R, FILLET_5_R), FILLET_5_R, 180, 90)
            Line((0, FILLET_5_R), (-FILLET_5_R * 0.02, FILLET_5_R))
            Line((-FILLET_5_R * 0.02, FILLET_5_R), (-FILLET_5_R * 0.02, -FILLET_5_R * 0.02))
            Line((-FILLET_5_R * 0.02, -FILLET_5_R * 0.02), (FILLET_5_R, -FILLET_5_R * 0.02))
            Line((FILLET_5_R, -FILLET_5_R * 0.02), (FILLET_5_R, 0))
        make_face()
    extrude(amount=88, mode=Mode.SUBTRACT)
    with BuildSketch(Plane(origin=(7.731803785, -22.633707849, 0), x_dir=(0, 0, 1), z_dir=(-1, 0, 0))) as fillet_5_2_piece_11:
        with BuildLine():
            CenterArc((FILLET_5_R, -FILLET_5_R), FILLET_5_R, 90, 90)
            Line((0, -FILLET_5_R), (-FILLET_5_R * 0.02, -FILLET_5_R))
            Line((-FILLET_5_R * 0.02, -FILLET_5_R), (-FILLET_5_R * 0.02, FILLET_5_R * 0.02))
            Line((-FILLET_5_R * 0.02, FILLET_5_R * 0.02), (FILLET_5_R, FILLET_5_R * 0.02))
            Line((FILLET_5_R, FILLET_5_R * 0.02), (FILLET_5_R, 0))
        make_face()
    extrude(amount=88, mode=Mode.SUBTRACT)
    with BuildSketch(Plane(origin=(8.731803785, -22.633707849, 1), x_dir=(-1, 0, 0), z_dir=(0, 0, 1))) as fillet_5_2_piece_12:
        with BuildLine():
            CenterArc((FILLET_5_R, FILLET_5_R), FILLET_5_R, 180, 90)
            Line((0, FILLET_5_R), (-FILLET_5_R * 0.02, FILLET_5_R))
            Line((-FILLET_5_R * 0.02, FILLET_5_R), (-FILLET_5_R * 0.02, -FILLET_5_R * 0.02))
            Line((-FILLET_5_R * 0.02, -FILLET_5_R * 0.02), (FILLET_5_R, -FILLET_5_R * 0.02))
            Line((FILLET_5_R, -FILLET_5_R * 0.02), (FILLET_5_R, 0))
        make_face()
    extrude(amount=18, mode=Mode.SUBTRACT)
    with BuildSketch(Plane(origin=(8.731803785, -47.633707849, 1), x_dir=(0, 1, 0), z_dir=(0, 0, 1))) as fillet_5_2_piece_13:
        with BuildLine():
            CenterArc((FILLET_5_R, FILLET_5_R), FILLET_5_R, 180, 90)
            Line((0, FILLET_5_R), (-FILLET_5_R * 0.02, FILLET_5_R))
            Line((-FILLET_5_R * 0.02, FILLET_5_R), (-FILLET_5_R * 0.02, -FILLET_5_R * 0.02))
            Line((-FILLET_5_R * 0.02, -FILLET_5_R * 0.02), (FILLET_5_R, -FILLET_5_R * 0.02))
            Line((FILLET_5_R, -FILLET_5_R * 0.02), (FILLET_5_R, 0))
        make_face()
    extrude(amount=19, mode=Mode.SUBTRACT)
    with BuildSketch(Plane(origin=(-81.268196215, -47.633707849, 1), x_dir=(0, 1, 0), z_dir=(0, 0, 1))) as fillet_5_2_piece_14:
        with BuildLine():
            CenterArc((FILLET_5_R, -FILLET_5_R), FILLET_5_R, 90, 90)
            Line((0, -FILLET_5_R), (-FILLET_5_R * 0.02, -FILLET_5_R))
            Line((-FILLET_5_R * 0.02, -FILLET_5_R), (-FILLET_5_R * 0.02, FILLET_5_R * 0.02))
            Line((-FILLET_5_R * 0.02, FILLET_5_R * 0.02), (FILLET_5_R, FILLET_5_R * 0.02))
            Line((FILLET_5_R, FILLET_5_R * 0.02), (FILLET_5_R, 0))
        make_face()
    extrude(amount=19, mode=Mode.SUBTRACT)
    with BuildSketch(Plane(origin=(-81.268196215, -22.633707849, 1), x_dir=(1, 0, 0), z_dir=(0, 0, 1))) as fillet_5_2_piece_15:
        with BuildLine():
            CenterArc((FILLET_5_R, -FILLET_5_R), FILLET_5_R, 90, 90)
            Line((0, -FILLET_5_R), (-FILLET_5_R * 0.02, -FILLET_5_R))
            Line((-FILLET_5_R * 0.02, -FILLET_5_R), (-FILLET_5_R * 0.02, FILLET_5_R * 0.02))
            Line((-FILLET_5_R * 0.02, FILLET_5_R * 0.02), (FILLET_5_R, FILLET_5_R * 0.02))
            Line((FILLET_5_R, FILLET_5_R * 0.02), (FILLET_5_R, 0))
        make_face()
    extrude(amount=18, mode=Mode.SUBTRACT)
    with BuildSketch(Plane(origin=(-81.268196215, -47.633707849, 1), x_dir=(0, 1, 0), z_dir=(0, 0, 1))) as fillet_5_2_piece_16a_section:
        with BuildLine():
            CenterArc((FILLET_5_R, -FILLET_5_R), FILLET_5_R, 90, 90)
            Line((0, -FILLET_5_R), (-FILLET_5_R * 0.02, -FILLET_5_R))
            Line((-FILLET_5_R * 0.02, -FILLET_5_R), (-FILLET_5_R * 0.02, FILLET_5_R * 0.02))
            Line((-FILLET_5_R * 0.02, FILLET_5_R * 0.02), (FILLET_5_R, FILLET_5_R * 0.02))
            Line((FILLET_5_R, FILLET_5_R * 0.02), (FILLET_5_R, 0))
        make_face()
    fillet_5_2_piece_16a = extrude(amount=21.5, mode=Mode.PRIVATE)
    fillet_5_2_piece_16a = split(fillet_5_2_piece_16a, bisect_by=Plane(origin=(-81.041801101, -47.407312734, 20), z_dir=(0, 0, 1)), keep=Keep.TOP, mode=Mode.PRIVATE)
    with BuildSketch(Plane(origin=(-81.268196215, -23.633707849, 20), x_dir=(0, 0, -1), z_dir=(0, -1, 0))) as fillet_5_2_piece_16b_section:
        with BuildLine():
            CenterArc((FILLET_5_R, FILLET_5_R), FILLET_5_R, 180, 90)
            Line((0, FILLET_5_R), (-FILLET_5_R * 0.02, FILLET_5_R))
            Line((-FILLET_5_R * 0.02, FILLET_5_R), (-FILLET_5_R * 0.02, -FILLET_5_R * 0.02))
            Line((-FILLET_5_R * 0.02, -FILLET_5_R * 0.02), (FILLET_5_R, -FILLET_5_R * 0.02))
            Line((FILLET_5_R, -FILLET_5_R * 0.02), (FILLET_5_R, 0))
        make_face()
    fillet_5_2_piece_16b = extrude(amount=26.5, mode=Mode.PRIVATE)
    fillet_5_2_piece_16b = split(fillet_5_2_piece_16b, bisect_by=Plane(origin=(-81.041801101, -47.633707849, 19.773604886), z_dir=(0, -1, 0)), keep=Keep.TOP, mode=Mode.PRIVATE)
    fillet_5_2_piece_16 = fillet_5_2_piece_16a & fillet_5_2_piece_16b
    add(fillet_5_2_piece_16, mode=Mode.SUBTRACT)
    with BuildSketch(Plane(origin=(8.731803785, -47.633707849, 1), x_dir=(0, 1, 0), z_dir=(0, 0, 1))) as fillet_5_2_piece_17a_section:
        with BuildLine():
            CenterArc((FILLET_5_R, FILLET_5_R), FILLET_5_R, 180, 90)
            Line((0, FILLET_5_R), (-FILLET_5_R * 0.02, FILLET_5_R))
            Line((-FILLET_5_R * 0.02, FILLET_5_R), (-FILLET_5_R * 0.02, -FILLET_5_R * 0.02))
            Line((-FILLET_5_R * 0.02, -FILLET_5_R * 0.02), (FILLET_5_R, -FILLET_5_R * 0.02))
            Line((FILLET_5_R, -FILLET_5_R * 0.02), (FILLET_5_R, 0))
        make_face()
    fillet_5_2_piece_17a = extrude(amount=21.5, mode=Mode.PRIVATE)
    fillet_5_2_piece_17a = split(fillet_5_2_piece_17a, bisect_by=Plane(origin=(8.505408671, -47.407312734, 20), z_dir=(0, 0, 1)), keep=Keep.TOP, mode=Mode.PRIVATE)
    with BuildSketch(Plane(origin=(8.731803785, -50.133707849, 20), x_dir=(0, 0, -1), z_dir=(0, 1, 0))) as fillet_5_2_piece_17b_section:
        with BuildLine():
            CenterArc((FILLET_5_R, FILLET_5_R), FILLET_5_R, 180, 90)
            Line((0, FILLET_5_R), (-FILLET_5_R * 0.02, FILLET_5_R))
            Line((-FILLET_5_R * 0.02, FILLET_5_R), (-FILLET_5_R * 0.02, -FILLET_5_R * 0.02))
            Line((-FILLET_5_R * 0.02, -FILLET_5_R * 0.02), (FILLET_5_R, -FILLET_5_R * 0.02))
            Line((FILLET_5_R, -FILLET_5_R * 0.02), (FILLET_5_R, 0))
        make_face()
    fillet_5_2_piece_17b = extrude(amount=26.5, mode=Mode.PRIVATE)
    fillet_5_2_piece_17b = split(fillet_5_2_piece_17b, bisect_by=Plane(origin=(8.505408671, -47.633707849, 19.773604886), z_dir=(0, -1, 0)), keep=Keep.TOP, mode=Mode.PRIVATE)
    fillet_5_2_piece_17 = fillet_5_2_piece_17a & fillet_5_2_piece_17b
    add(fillet_5_2_piece_17, mode=Mode.SUBTRACT)
    # the kernel refuses this fillet: 1 mm, written as the material it takes off along each edge
    with BuildSketch(Plane(origin=(6.731803785, -44.633707849, 0), x_dir=(1, 0, 0), z_dir=(0, 1, 0)), Plane(origin=(-35.514595871, -25.633707849, 0), x_dir=(-1, 0, 0), z_dir=(0, -1, 0))) as fillet_5_3_piece_1:
        with BuildLine():
            CenterArc((FILLET_5_R, -FILLET_5_R), FILLET_5_R, 90, 90)
            Line((0, -FILLET_5_R), (-FILLET_5_R * 0.02, -FILLET_5_R))
            Line((-FILLET_5_R * 0.02, -FILLET_5_R), (-FILLET_5_R * 0.02, FILLET_5_R * 0.02))
            Line((-FILLET_5_R * 0.02, FILLET_5_R * 0.02), (FILLET_5_R, FILLET_5_R * 0.02))
            Line((FILLET_5_R, FILLET_5_R * 0.02), (FILLET_5_R, 0))
        make_face()
    extrude(amount=19, mode=Mode.SUBTRACT)
    with BuildSketch(Plane(origin=(-34.514595871, -45.633707849, 0), x_dir=(0, -1, 0), z_dir=(1, 0, 0)), Plane(origin=(5.731803785, -24.633707849, 0), x_dir=(0, 1, 0), z_dir=(-1, 0, 0)), Plane(origin=(-78.268196215, -45.633707849, 0), x_dir=(0, -1, 0), z_dir=(1, 0, 0))) as fillet_5_3_piece_2:
        with BuildLine():
            CenterArc((FILLET_5_R, -FILLET_5_R), FILLET_5_R, 90, 90)
            Line((0, -FILLET_5_R), (-FILLET_5_R * 0.02, -FILLET_5_R))
            Line((-FILLET_5_R * 0.02, -FILLET_5_R), (-FILLET_5_R * 0.02, FILLET_5_R * 0.02))
            Line((-FILLET_5_R * 0.02, FILLET_5_R * 0.02), (FILLET_5_R, FILLET_5_R * 0.02))
            Line((FILLET_5_R, FILLET_5_R * 0.02), (FILLET_5_R, 0))
        make_face()
    extrude(amount=40.246399656, mode=Mode.SUBTRACT)
    with BuildSketch(Plane(origin=(-79.268196215, -21.133707849, 0), x_dir=(-1, 0, 0), z_dir=(0, -1, 0))) as fillet_5_3_piece_3_section:
        with BuildLine():
            CenterArc((FILLET_5_R, -FILLET_5_R), FILLET_5_R, 90, 90)
            Line((0, -FILLET_5_R), (-FILLET_5_R * 0.02, -FILLET_5_R))
            Line((-FILLET_5_R * 0.02, -FILLET_5_R), (-FILLET_5_R * 0.02, FILLET_5_R * 0.02))
            Line((-FILLET_5_R * 0.02, FILLET_5_R * 0.02), (FILLET_5_R, FILLET_5_R * 0.02))
            Line((FILLET_5_R, FILLET_5_R * 0.02), (FILLET_5_R, 0))
        make_face()
    fillet_5_3_piece_3 = extrude(amount=23.5, mode=Mode.PRIVATE)
    fillet_5_3_piece_3 = fillet_5_3_piece_3 - Plane(origin=(-79.498098489, -23.633707849, 1), x_dir=(0, 1, 0), z_dir=(1, 0, 0)) * Cylinder(1, 51, mode=Mode.PRIVATE)
    add(fillet_5_3_piece_3, mode=Mode.SUBTRACT)
    with BuildSketch(Plane(origin=(-37.021796559, -44.633707849, 0), x_dir=(1, 0, 0), z_dir=(0, 1, 0))) as fillet_5_3_piece_4_section:
        with BuildLine():
            CenterArc((FILLET_5_R, -FILLET_5_R), FILLET_5_R, 90, 90)
            Line((0, -FILLET_5_R), (-FILLET_5_R * 0.02, -FILLET_5_R))
            Line((-FILLET_5_R * 0.02, -FILLET_5_R), (-FILLET_5_R * 0.02, FILLET_5_R * 0.02))
            Line((-FILLET_5_R * 0.02, FILLET_5_R * 0.02), (FILLET_5_R, FILLET_5_R * 0.02))
            Line((FILLET_5_R, FILLET_5_R * 0.02), (FILLET_5_R, 0))
        make_face()
    fillet_5_3_piece_4 = extrude(amount=23.5, mode=Mode.PRIVATE)
    fillet_5_3_piece_4 = fillet_5_3_piece_4 - Plane(origin=(-36.791894324, -23.633707849, 1), x_dir=(0, 1, 0), z_dir=(1, 0, 0)) * Cylinder(1, 52, mode=Mode.PRIVATE)
    add(fillet_5_3_piece_4, mode=Mode.SUBTRACT)
    with BuildSketch(Plane(origin=(-78.268196215, -44.633707849, 0), x_dir=(0, -1, 0), z_dir=(1, 0, 0))) as fillet_5_3_piece_5:
        with BuildLine():
            CenterArc((1 + FILLET_5_R, -FILLET_5_R), FILLET_5_R, 90, 90)
            Line((1, -FILLET_5_R), (1 - FILLET_5_R * 0.02, -FILLET_5_R))
            Line((1 - FILLET_5_R * 0.02, -FILLET_5_R), (1 - FILLET_5_R * 0.02, FILLET_5_R * 0.02))
            Line((1 - FILLET_5_R * 0.02, FILLET_5_R * 0.02), (1 + FILLET_5_R, FILLET_5_R * 0.02))
            Line((1 + FILLET_5_R, FILLET_5_R * 0.02), (1 + FILLET_5_R, 0))
        make_face()
    revolve(axis=Axis((-78.268196215, -44.633707849, 0), (0, 0, -1)), revolution_arc=90, mode=Mode.SUBTRACT)
    with BuildSketch(Plane(origin=(-38.021796559, -44.633707849, 0), x_dir=(0, -1, 0), z_dir=(-1, 0, 0))) as fillet_5_3_piece_6:
        with BuildLine():
            CenterArc((1 + FILLET_5_R, FILLET_5_R), FILLET_5_R, 180, 90)
            Line((1, FILLET_5_R), (1 - FILLET_5_R * 0.02, FILLET_5_R))
            Line((1 - FILLET_5_R * 0.02, FILLET_5_R), (1 - FILLET_5_R * 0.02, -FILLET_5_R * 0.02))
            Line((1 - FILLET_5_R * 0.02, -FILLET_5_R * 0.02), (1 + FILLET_5_R, -FILLET_5_R * 0.02))
            Line((1 + FILLET_5_R, -FILLET_5_R * 0.02), (1 + FILLET_5_R, 0))
        make_face()
    revolve(axis=Axis((-38.021796559, -44.633707849, 0), (0, 0, 1)), revolution_arc=90, mode=Mode.SUBTRACT)
    with BuildSketch(Plane(origin=(5.731803785, -25.633707849, 0), x_dir=(0, 1, 0), z_dir=(-1, 0, 0))) as fillet_5_3_piece_7:
        with BuildLine():
            CenterArc((1 + FILLET_5_R, -FILLET_5_R), FILLET_5_R, 90, 90)
            Line((1, -FILLET_5_R), (1 - FILLET_5_R * 0.02, -FILLET_5_R))
            Line((1 - FILLET_5_R * 0.02, -FILLET_5_R), (1 - FILLET_5_R * 0.02, FILLET_5_R * 0.02))
            Line((1 - FILLET_5_R * 0.02, FILLET_5_R * 0.02), (1 + FILLET_5_R, FILLET_5_R * 0.02))
            Line((1 + FILLET_5_R, FILLET_5_R * 0.02), (1 + FILLET_5_R, 0))
        make_face()
    revolve(axis=Axis((5.731803785, -25.633707849, 0), (0, 0, -1)), revolution_arc=90, mode=Mode.SUBTRACT)
    with BuildSketch(Plane(origin=(-34.514595871, -25.633707849, 0), x_dir=(0, 1, 0), z_dir=(1, 0, 0))) as fillet_5_3_piece_8:
        with BuildLine():
            CenterArc((1 + FILLET_5_R, FILLET_5_R), FILLET_5_R, 180, 90)
            Line((1, FILLET_5_R), (1 - FILLET_5_R * 0.02, FILLET_5_R))
            Line((1 - FILLET_5_R * 0.02, FILLET_5_R), (1 - FILLET_5_R * 0.02, -FILLET_5_R * 0.02))
            Line((1 - FILLET_5_R * 0.02, -FILLET_5_R * 0.02), (1 + FILLET_5_R, -FILLET_5_R * 0.02))
            Line((1 + FILLET_5_R, -FILLET_5_R * 0.02), (1 + FILLET_5_R, 0))
        make_face()
    revolve(axis=Axis((-34.514595871, -25.633707849, 0), (0, 0, 1)), revolution_arc=90, mode=Mode.SUBTRACT)
    with BuildSketch(Plane(origin=(-34.514595871, -44.633707849, 0), x_dir=(-1, 0, 0), z_dir=(0, 1, 0))) as fillet_5_3_piece_9:
        with BuildLine():
            CenterArc((1 + FILLET_5_R, FILLET_5_R), FILLET_5_R, 180, 90)
            Line((1, FILLET_5_R), (1 - FILLET_5_R * 0.02, FILLET_5_R))
            Line((1 - FILLET_5_R * 0.02, FILLET_5_R), (1 - FILLET_5_R * 0.02, -FILLET_5_R * 0.02))
            Line((1 - FILLET_5_R * 0.02, -FILLET_5_R * 0.02), (1 + FILLET_5_R, -FILLET_5_R * 0.02))
            Line((1 + FILLET_5_R, -FILLET_5_R * 0.02), (1 + FILLET_5_R, 0))
        make_face()
    revolve(axis=Axis((-34.514595871, -44.633707849, 0), (0, 0, 1)), revolution_arc=90, mode=Mode.SUBTRACT)
    with BuildSketch(Plane(origin=(5.731803785, -44.633707849, 0), x_dir=(0, -1, 0), z_dir=(-1, 0, 0))) as fillet_5_3_piece_10:
        with BuildLine():
            CenterArc((1 + FILLET_5_R, FILLET_5_R), FILLET_5_R, 180, 90)
            Line((1, FILLET_5_R), (1 - FILLET_5_R * 0.02, FILLET_5_R))
            Line((1 - FILLET_5_R * 0.02, FILLET_5_R), (1 - FILLET_5_R * 0.02, -FILLET_5_R * 0.02))
            Line((1 - FILLET_5_R * 0.02, -FILLET_5_R * 0.02), (1 + FILLET_5_R, -FILLET_5_R * 0.02))
            Line((1 + FILLET_5_R, -FILLET_5_R * 0.02), (1 + FILLET_5_R, 0))
        make_face()
    revolve(axis=Axis((5.731803785, -44.633707849, 0), (0, 0, 1)), revolution_arc=90, mode=Mode.SUBTRACT)


solid = part.part
